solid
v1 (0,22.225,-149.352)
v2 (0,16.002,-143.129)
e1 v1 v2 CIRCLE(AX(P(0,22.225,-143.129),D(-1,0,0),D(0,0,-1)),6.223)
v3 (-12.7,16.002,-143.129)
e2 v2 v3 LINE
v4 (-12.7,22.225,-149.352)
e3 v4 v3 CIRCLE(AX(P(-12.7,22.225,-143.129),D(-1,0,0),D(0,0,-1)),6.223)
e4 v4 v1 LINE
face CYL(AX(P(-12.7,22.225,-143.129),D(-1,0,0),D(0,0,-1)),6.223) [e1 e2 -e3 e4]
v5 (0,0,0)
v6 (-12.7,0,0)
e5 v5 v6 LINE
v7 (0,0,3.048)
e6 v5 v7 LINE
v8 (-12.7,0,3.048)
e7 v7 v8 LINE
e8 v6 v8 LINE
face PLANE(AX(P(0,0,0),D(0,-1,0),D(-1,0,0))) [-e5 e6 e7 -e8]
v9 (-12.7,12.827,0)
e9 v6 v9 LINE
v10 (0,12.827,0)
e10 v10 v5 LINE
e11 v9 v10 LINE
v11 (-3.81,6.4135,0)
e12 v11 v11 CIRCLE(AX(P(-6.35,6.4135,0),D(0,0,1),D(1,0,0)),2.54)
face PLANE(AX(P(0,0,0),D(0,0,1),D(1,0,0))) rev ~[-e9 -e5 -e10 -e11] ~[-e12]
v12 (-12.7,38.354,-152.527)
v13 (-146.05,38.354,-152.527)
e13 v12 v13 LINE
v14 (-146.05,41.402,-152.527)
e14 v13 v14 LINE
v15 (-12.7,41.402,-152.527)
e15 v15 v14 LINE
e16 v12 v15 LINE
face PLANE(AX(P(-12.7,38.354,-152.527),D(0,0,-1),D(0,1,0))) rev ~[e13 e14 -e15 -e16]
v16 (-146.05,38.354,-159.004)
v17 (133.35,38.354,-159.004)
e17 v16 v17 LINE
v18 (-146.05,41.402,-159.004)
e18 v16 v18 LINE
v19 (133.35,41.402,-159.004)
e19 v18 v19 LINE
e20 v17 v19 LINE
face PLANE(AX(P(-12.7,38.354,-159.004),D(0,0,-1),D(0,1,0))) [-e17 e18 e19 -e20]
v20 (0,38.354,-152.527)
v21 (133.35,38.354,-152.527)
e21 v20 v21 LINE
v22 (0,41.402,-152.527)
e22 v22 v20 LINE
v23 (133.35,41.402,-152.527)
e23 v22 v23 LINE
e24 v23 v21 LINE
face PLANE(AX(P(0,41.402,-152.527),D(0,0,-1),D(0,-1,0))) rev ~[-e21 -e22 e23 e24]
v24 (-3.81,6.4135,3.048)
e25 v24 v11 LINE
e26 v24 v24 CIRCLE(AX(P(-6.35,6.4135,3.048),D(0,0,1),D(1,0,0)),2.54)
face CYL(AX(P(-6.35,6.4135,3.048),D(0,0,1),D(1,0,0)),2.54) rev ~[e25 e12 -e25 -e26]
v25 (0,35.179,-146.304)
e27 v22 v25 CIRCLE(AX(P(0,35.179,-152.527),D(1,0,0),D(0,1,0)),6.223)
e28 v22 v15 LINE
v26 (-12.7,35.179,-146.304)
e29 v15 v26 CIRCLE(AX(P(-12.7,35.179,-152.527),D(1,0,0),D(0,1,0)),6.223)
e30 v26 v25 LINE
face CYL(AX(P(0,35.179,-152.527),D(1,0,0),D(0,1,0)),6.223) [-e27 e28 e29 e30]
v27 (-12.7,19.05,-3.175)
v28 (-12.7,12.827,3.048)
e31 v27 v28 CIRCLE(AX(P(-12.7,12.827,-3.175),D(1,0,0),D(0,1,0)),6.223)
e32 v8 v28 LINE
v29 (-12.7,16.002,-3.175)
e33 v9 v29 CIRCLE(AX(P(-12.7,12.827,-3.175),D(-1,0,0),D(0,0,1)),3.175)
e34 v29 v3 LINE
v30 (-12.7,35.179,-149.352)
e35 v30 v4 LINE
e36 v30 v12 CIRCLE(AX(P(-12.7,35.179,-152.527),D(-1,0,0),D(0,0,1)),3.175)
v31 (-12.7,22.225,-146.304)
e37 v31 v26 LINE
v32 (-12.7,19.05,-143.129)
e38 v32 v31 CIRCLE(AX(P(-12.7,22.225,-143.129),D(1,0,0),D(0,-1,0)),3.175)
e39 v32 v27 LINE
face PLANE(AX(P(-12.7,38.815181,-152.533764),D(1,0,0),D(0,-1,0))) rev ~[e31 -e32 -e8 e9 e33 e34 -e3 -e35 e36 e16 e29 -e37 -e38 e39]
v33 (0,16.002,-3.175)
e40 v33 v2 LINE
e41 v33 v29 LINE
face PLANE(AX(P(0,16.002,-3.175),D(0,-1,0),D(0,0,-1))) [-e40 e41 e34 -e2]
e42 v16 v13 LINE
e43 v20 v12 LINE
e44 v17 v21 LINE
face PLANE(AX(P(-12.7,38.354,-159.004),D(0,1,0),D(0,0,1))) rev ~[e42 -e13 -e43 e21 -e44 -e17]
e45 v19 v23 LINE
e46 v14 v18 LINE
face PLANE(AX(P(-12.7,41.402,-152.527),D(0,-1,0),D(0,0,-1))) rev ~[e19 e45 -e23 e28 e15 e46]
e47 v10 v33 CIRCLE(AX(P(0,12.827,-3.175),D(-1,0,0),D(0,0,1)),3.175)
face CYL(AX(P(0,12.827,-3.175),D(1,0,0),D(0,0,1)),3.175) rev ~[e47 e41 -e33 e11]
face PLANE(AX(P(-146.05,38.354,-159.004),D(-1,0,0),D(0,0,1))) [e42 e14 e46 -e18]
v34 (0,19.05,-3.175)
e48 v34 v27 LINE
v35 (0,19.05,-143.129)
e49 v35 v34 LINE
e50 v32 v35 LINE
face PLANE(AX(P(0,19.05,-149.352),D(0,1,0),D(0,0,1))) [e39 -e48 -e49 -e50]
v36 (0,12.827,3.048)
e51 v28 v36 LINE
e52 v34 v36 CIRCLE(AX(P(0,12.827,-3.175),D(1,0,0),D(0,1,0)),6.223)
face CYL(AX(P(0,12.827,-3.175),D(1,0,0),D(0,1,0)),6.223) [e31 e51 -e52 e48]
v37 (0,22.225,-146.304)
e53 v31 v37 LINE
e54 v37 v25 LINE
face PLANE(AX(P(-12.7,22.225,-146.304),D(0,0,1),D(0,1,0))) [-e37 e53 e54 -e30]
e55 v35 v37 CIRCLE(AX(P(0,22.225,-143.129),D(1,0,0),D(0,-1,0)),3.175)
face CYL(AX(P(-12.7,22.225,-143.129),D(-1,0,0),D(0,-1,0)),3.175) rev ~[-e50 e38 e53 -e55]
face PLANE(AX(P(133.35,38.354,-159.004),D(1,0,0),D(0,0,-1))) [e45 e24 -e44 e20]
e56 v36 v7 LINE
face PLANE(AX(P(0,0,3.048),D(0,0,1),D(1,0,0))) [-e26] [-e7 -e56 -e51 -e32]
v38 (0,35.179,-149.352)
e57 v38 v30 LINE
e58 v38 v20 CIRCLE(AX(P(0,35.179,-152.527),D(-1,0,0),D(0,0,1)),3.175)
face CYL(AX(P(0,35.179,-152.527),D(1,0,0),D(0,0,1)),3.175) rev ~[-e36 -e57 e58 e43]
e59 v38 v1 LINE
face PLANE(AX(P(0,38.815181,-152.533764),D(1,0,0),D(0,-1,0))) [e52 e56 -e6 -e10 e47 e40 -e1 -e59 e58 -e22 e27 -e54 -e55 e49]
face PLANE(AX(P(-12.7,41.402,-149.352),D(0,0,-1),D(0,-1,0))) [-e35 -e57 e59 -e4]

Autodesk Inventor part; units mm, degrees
ref_plane "YZ Plane" through (0, 0, 0) normal (1, 0, 0) x (0, 1, 0)
ref_plane "XZ Plane" through (0, 0, 0) normal (0, 1, 0) x (-1, 0, 0)
ref_plane "XY Plane" through (0, 0, 0) normal (0, 0, 1) x (1, 0, 0)
sketch "Sketch1" plane through (0, 0, 0) normal (0, 0, 1) x (1, 0, 0)
  line L0 (0, 0) -> (-12.7, 0)
  line L1 (-12.7, 0) -> (-12.7, 19.05)
  line L2 (-12.7, 19.05) -> (0, 19.05)
  line L3 (0, 19.05) -> (0, 0)
  dimension "d0" = 12.7
  dimension "d1" = 19.05
extrude "Plate1" add sketch "Sketch1" along normal blind 3.048
sketch "Sketch2" plane through (0, 16.002, 3.048) normal (0, 1, 0) x (-1, 0, 0)
  line L0 (12.7, 0) -> (0, 0)
  line L1 (0, 0) -> (0, -152.4)
  line L2 (0, -152.4) -> (12.7, -152.4)
  line L3 (12.7, -152.4) -> (12.7, 0)
edge flange "Flange1" height 152.4 angle 90 thickness 3.048 bend radius 3.175 thickness toward (0, 1, 0) relief tear relief width 3.048 relief depth 1.524 edges at (-6.35, 19.05, 0) wall of the first edge with corners at (-12.7, 16.002, 3.048) (0, 16.002, 3.048) (0, 16.002, -149.352) (-12.7, 16.002, -149.352)
bend "Bend1"
corner "Corner1"
sketch "Sketch3" plane through (0, 0, 3.048) normal (0, 0, 1) x (1, 0, 0)
  line L0 (0, 12.827) -> (-12.7, 12.827) projected
  line L1 (0, 12.827) -> (0, 0) projected
  circle A0 centre (-6.35, 6.4135) radius 2.54
  dimension "d13" = 5.08
  dimension "d15" = 6.4135
  dimension "d16" = 6.35
extrude "Cut1" cut sketch "Sketch3" against normal blind 3.048
sketch "Sketch4" plane through (-12.7, 16.002, -146.304) normal (0, 0, -1) x (-1, 0, 0)
  line L0 (-12.7, 0) -> (0, 0)
  line L1 (0, 0) -> (0, 25.4)
  line L2 (0, 25.4) -> (-12.7, 25.4)
  line L3 (-12.7, 25.4) -> (-12.7, 0)
edge flange "Flange2" height 25.4 angle 90 thickness 3.048 bend radius 3.175 thickness toward (0, 0, -1) relief tear relief width 3.048 relief depth 1.524 edges at (-6.35, 19.05, -149.352) wall of the first edge with corners at (0, 16.002, -146.304) (-12.7, 16.002, -146.304) (-12.7, 41.402, -146.304) (0, 41.402, -146.304)
bend "Bend2"
corner "Corner2"
sketch "Sketch5" plane through (0, 38.354, -146.304) normal (0, 1, 0) x (-1, 0, 0)
  line L0 (12.7, 0) -> (0, 0)
  line L1 (0, 0) -> (0, -12.7)
  line L2 (0, -12.7) -> (12.7, -12.7)
  line L3 (12.7, -12.7) -> (12.7, 0)
edge flange "Flange3" height 12.7 angle 90 thickness 3.048 bend radius 3.175 thickness toward (0, 1, 0) relief tear relief width 3.048 relief depth 1.524 edges at (-6.35, 41.402, -149.352) wall of the first edge with corners at (-12.7, 38.354, -146.304) (0, 38.354, -146.304) (0, 38.354, -159.004) (-12.7, 38.354, -159.004)
bend "Bend3"
corner "Corner3"
sketch "Sketch6" plane through (0, 38.354, -159.004) normal (1, 0, 0) x (0, 0, -1)
  line L0 (-6.477, 3.048) -> (-6.477, 0) projected
  line L1 (0, 0) -> (-6.477, 0) projected
  line L2 (0, 0) -> (0, 3.048) projected
  line L3 (0, 3.048) -> (-6.477, 3.048) projected
  point P0 (-159.004, -38.354)
extrude "Extrusion1" add sketch "Sketch6" along normal blind 133.35
sketch "Sketch7" plane through (-12.7, 38.354, -159.004) normal (-1, 0, 0) x (0, 0, 1)
  line L0 (6.477, 0) -> (6.477, 3.048) projected
  line L1 (6.477, 3.048) -> (0, 3.048) projected
  line L2 (0, 0) -> (0, 3.048) projected
  line L3 (0, 0) -> (6.477, 0) projected
  point P0 (159.004, -38.354)
extrude "Extrusion2" add sketch "Sketch7" along normal blind 133.35
sketch "Sketch8" plane through (0, 16.002, -3.175) normal (1, 0, 0) x (0, 0, -1)
  line L0 (139.954, 0) -> (139.954, 3.048) projected
  line L1 (139.954, 3.048) -> (0, 3.048) projected
  line L2 (0, 3.048) -> (0, 0) projected
  line L3 (139.954, 0) -> (0, 0) projected
  line L4 (12.7, 3.048) -> (25.4, 3.048)
  line L5 (25.4, 3.048) -> (25.4, 0)
  line L6 (25.4, 0) -> (12.7, 0)
  line L7 (12.7, 3.048) -> (12.7, 0)
  point P0 (-3.175, -16.002)
  dimension "d43" = 12.7
  dimension "d44" = 12.7
sketch "Sketch9" plane through (0, 38.354, -152.527) normal (0, 0, 1) x (1, 0, 0)
  line L0 (0, 3.048) -> (0, 0) projected
  line L1 (0, 0) -> (133.35, 0) projected
  line L2 (133.35, 3.048) -> (133.35, 0) projected
  line L3 (0, 3.048) -> (133.35, 3.048) projected
  line L4 (133.35, 0) -> (120.65, 0)
  line L5 (120.65, 0) -> (120.65, 3.048)
  line L6 (133.35, 3.048) -> (120.65, 3.048)
  line L7 (133.35, 3.048) -> (133.35, 0)
  point P0 (0, -38.354)
  dimension "d45" = 12.7
equation "\"d17\" = Thickness"
equation "\"d3\" = BendReliefWidth"
equation "\"d4\" = BendReliefDepth"
equation "\"d5\" = MinimumRemnant"
equation "\"d6\" = BendRadius"
equation "\"d10\" = CornerReliefSize"
equation "\"d11\" = GapSize"
equation "\"d12\" = JacobiRadiusSize"
equation "\"d19\" = BendReliefWidth"
equation "\"d20\" = BendReliefDepth"
equation "\"d21\" = MinimumRemnant"
equation "\"d22\" = BendRadius"
equation "\"d26\" = CornerReliefSize"
equation "\"d27\" = GapSize"
equation "\"d28\" = JacobiRadiusSize"
equation "\"d29\" = BendReliefWidth"
equation "\"d30\" = BendReliefDepth"
equation "\"d31\" = MinimumRemnant"
equation "\"d32\" = BendRadius"
equation "\"d36\" = CornerReliefSize"
equation "\"d37\" = GapSize"
equation "\"d38\" = JacobiRadiusSize"
equation "\"BendRadius\" = Thickness"
equation "\"BendReliefWidth\" = Thickness"
equation "\"BendReliefDepth\" = 0.5 * Thickness"
equation "\"CornerReliefSize\" = 4 * Thickness"
equation "\"MinimumRemnant\" = 2 * Thickness"
equation "\"TransitionRadius\" = BendRadius"
equation "\"JacobiRadiusSize\" = BendRadius"
equation "\"GapSize\" = Thickness"
equation "\"d2\" = BendRadius"
equation "\"Thickness\" = 3.048"
properties part number "Feeder-Grabber_v1"
